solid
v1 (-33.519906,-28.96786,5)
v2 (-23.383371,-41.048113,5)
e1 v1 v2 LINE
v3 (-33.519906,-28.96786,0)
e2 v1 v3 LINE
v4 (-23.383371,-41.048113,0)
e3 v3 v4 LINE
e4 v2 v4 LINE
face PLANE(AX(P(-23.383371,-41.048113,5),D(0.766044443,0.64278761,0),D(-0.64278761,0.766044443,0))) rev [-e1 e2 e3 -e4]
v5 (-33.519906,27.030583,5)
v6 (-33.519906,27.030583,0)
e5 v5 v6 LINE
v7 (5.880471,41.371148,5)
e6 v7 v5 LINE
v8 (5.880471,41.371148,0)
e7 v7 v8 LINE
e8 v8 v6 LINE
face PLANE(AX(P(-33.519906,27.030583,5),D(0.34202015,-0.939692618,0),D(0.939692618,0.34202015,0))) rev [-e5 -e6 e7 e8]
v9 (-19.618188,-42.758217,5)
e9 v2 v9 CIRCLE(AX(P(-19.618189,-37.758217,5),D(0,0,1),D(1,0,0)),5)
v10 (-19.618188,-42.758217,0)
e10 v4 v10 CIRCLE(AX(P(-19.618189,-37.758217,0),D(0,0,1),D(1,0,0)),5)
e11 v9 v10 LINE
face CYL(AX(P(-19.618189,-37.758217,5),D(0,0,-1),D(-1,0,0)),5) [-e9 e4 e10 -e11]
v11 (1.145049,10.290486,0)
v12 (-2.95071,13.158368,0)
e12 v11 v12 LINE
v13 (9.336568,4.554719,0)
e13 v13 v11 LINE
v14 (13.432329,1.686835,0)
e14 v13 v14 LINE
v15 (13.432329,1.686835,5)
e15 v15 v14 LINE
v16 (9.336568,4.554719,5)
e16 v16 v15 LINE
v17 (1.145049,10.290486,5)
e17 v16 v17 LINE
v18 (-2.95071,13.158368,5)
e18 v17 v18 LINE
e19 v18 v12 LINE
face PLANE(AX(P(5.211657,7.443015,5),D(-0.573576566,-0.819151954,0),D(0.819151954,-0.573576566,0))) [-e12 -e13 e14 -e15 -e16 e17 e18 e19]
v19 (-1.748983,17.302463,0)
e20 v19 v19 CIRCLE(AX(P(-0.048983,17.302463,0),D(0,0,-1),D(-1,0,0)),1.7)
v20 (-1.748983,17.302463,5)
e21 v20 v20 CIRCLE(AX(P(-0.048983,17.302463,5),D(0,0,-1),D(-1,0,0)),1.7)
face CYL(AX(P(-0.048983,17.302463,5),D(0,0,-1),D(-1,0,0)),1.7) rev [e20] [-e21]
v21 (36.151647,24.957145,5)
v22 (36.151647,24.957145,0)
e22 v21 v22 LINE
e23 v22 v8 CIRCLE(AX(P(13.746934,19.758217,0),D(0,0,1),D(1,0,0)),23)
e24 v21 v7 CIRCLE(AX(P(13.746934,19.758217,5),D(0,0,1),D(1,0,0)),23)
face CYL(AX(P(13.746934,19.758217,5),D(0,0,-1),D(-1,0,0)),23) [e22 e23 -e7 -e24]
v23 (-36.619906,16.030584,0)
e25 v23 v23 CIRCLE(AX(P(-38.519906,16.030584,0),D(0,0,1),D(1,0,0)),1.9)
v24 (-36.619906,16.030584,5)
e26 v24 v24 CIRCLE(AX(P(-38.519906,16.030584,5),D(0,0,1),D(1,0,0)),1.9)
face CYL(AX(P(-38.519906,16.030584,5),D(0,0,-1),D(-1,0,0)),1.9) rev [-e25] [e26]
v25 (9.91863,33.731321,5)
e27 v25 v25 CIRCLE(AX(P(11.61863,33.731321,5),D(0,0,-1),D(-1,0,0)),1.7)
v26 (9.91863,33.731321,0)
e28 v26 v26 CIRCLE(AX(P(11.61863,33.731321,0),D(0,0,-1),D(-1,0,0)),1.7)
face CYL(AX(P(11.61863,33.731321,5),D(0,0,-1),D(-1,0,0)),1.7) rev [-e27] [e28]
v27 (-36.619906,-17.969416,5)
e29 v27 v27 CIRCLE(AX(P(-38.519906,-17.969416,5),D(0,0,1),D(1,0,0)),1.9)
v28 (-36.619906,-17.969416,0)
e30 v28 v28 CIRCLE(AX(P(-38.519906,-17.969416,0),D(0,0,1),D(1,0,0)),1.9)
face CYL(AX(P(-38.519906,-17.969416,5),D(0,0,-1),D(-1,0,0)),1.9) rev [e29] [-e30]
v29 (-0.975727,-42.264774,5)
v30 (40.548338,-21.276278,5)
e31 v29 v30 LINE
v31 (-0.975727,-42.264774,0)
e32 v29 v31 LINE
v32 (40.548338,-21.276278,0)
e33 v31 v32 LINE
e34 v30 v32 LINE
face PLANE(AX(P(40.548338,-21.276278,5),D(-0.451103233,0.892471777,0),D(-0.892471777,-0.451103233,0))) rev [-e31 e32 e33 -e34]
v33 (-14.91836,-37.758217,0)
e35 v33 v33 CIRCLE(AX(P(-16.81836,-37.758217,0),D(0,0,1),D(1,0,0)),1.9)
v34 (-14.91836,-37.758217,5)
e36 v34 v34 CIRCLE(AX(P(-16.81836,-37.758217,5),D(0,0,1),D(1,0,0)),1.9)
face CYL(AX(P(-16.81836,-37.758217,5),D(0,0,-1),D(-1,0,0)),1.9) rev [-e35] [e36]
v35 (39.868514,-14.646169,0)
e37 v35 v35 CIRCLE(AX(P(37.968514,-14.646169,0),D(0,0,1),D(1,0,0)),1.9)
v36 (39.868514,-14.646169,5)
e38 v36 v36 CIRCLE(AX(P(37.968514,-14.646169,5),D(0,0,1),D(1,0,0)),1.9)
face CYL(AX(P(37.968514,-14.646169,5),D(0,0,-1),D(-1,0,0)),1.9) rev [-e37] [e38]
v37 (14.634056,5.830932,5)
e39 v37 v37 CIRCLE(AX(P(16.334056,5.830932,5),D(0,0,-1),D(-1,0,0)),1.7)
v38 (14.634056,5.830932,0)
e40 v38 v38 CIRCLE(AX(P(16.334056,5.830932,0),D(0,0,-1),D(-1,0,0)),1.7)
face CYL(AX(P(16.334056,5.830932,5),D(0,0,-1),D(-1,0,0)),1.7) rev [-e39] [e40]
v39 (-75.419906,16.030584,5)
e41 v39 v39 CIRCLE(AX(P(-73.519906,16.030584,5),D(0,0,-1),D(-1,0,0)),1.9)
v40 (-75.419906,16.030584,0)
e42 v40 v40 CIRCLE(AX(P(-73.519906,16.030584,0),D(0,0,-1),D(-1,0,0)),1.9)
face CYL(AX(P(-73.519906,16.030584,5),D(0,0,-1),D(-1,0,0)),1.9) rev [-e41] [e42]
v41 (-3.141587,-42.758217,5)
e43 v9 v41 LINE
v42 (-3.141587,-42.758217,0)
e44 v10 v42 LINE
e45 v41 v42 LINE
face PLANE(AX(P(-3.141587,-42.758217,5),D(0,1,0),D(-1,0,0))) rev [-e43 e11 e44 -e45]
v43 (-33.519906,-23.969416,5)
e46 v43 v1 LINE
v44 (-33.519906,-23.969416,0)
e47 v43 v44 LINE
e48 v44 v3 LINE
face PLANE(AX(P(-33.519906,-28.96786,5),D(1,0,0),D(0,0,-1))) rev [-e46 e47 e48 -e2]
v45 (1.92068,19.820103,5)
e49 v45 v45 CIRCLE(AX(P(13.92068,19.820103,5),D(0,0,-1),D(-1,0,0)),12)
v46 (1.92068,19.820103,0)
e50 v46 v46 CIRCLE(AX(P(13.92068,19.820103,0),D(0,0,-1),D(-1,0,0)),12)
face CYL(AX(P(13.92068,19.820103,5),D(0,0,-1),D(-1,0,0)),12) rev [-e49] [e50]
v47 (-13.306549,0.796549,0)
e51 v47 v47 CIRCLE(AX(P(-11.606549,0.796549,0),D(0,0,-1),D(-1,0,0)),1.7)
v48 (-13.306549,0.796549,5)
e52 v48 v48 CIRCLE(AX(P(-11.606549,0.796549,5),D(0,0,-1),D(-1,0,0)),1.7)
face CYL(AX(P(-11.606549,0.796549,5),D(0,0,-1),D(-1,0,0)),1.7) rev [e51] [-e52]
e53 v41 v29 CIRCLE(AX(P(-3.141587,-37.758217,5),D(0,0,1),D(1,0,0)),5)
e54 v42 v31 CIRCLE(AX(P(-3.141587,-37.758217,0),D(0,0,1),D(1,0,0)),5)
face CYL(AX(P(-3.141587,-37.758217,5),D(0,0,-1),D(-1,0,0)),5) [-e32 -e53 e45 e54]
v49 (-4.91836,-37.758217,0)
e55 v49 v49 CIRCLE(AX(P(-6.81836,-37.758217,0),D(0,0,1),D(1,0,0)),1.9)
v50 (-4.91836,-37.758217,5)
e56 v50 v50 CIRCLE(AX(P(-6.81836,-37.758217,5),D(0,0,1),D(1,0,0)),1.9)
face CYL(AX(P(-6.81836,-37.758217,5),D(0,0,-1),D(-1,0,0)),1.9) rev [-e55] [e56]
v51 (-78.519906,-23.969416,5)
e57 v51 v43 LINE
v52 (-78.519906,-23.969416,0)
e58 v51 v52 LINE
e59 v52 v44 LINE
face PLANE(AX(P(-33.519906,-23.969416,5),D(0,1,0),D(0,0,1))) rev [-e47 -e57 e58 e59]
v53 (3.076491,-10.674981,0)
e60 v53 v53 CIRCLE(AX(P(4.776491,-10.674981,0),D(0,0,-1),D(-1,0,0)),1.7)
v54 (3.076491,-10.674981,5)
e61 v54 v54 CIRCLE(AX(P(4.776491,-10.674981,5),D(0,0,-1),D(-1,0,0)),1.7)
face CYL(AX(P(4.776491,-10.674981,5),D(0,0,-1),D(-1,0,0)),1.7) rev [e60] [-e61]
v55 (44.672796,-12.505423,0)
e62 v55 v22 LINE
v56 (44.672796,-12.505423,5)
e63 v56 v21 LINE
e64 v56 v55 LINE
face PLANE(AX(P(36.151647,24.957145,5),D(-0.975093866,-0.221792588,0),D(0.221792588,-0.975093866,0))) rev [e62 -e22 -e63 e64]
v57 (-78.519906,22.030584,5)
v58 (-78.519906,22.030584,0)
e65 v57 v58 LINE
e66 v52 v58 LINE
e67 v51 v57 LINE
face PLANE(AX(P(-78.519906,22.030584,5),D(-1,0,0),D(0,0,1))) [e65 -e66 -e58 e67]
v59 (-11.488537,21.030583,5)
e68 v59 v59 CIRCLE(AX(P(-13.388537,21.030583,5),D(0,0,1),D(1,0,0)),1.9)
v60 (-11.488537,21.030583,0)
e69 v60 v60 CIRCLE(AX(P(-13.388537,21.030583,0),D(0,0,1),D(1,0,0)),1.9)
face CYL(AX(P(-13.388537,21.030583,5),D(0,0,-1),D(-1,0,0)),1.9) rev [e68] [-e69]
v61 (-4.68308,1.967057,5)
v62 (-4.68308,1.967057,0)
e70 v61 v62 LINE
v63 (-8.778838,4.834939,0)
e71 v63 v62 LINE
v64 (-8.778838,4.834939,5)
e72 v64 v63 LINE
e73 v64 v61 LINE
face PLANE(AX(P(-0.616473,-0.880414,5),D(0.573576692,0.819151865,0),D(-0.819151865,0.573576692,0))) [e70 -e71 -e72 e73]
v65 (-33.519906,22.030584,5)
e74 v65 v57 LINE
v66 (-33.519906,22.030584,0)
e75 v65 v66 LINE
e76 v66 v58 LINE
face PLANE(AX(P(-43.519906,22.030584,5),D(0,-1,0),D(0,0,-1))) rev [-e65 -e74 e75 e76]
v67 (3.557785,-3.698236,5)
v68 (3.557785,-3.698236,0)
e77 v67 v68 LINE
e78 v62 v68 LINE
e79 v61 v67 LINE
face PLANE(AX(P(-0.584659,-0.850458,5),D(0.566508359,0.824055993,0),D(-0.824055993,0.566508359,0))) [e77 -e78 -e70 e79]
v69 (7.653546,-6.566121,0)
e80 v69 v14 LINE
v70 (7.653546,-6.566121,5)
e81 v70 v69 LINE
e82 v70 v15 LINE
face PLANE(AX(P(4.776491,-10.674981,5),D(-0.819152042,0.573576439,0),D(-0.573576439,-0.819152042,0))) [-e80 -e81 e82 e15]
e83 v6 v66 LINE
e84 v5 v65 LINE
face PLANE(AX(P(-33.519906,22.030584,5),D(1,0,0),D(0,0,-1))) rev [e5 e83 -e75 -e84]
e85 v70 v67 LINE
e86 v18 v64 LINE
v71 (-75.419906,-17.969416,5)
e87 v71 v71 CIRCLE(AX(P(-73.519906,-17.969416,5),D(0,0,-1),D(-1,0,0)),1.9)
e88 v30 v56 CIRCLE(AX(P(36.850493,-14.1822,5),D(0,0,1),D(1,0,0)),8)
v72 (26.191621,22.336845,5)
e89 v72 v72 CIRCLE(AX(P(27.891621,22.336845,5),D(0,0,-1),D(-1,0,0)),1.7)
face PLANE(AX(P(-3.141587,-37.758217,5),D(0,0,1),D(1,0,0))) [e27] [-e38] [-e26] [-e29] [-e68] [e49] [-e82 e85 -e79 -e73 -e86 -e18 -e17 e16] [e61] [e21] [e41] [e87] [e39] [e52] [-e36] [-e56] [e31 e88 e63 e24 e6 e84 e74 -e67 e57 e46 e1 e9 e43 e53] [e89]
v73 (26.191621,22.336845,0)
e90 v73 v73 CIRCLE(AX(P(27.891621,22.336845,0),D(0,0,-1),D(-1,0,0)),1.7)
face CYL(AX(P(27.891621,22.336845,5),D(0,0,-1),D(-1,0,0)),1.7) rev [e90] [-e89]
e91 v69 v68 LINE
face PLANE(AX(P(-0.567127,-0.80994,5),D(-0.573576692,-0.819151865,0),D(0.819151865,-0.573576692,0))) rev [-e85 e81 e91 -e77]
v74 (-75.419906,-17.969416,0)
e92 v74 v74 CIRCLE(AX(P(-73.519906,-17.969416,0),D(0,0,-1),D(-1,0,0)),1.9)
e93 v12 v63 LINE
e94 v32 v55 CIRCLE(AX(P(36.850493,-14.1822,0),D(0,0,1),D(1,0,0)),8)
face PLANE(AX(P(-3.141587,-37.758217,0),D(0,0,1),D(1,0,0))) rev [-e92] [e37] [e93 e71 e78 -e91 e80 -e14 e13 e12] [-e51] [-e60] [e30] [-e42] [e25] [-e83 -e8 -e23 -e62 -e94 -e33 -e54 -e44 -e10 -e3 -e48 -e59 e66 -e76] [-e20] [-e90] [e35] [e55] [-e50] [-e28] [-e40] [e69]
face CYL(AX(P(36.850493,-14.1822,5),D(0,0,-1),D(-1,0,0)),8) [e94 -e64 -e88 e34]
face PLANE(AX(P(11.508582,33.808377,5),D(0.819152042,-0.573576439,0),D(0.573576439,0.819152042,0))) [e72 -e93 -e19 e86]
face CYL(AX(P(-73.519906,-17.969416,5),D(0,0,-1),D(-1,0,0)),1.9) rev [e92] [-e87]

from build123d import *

# Parameters (mm, degrees)
ESQUISSE1_R         = 1.9
BOSS_EXTRU_1_DEPTH  = 5
EXTRUDE_1_DEPTH     = 5
EXTRUDE_2_DEPTH     = 5
SKETCH_6_R          = 1.6
CUT_EXTRUDE_2_DEPTH = 5
EXTRUDE_4_DEPTH     = 5
CUT_EXTRUDE_3_DEPTH = 5
EXTRUDE_6_DEPTH     = 5
SKETCH_10_R         = 12
CUT_EXTRUDE_4_DEPTH = 5
SKETCH_11_R         = 12.59581588
SKETCH_11_R_2       = 8.721789125
EXTRUDE_7_DEPTH     = 5
SKETCH_12_R         = 12
CUT_EXTRUDE_5_DEPTH = 5
SKETCH_13_R         = 3.051220473
SKETCH_13_R_2       = 0.885355671
SKETCH_13_R_3       = 2.495868873
SKETCH_13_R_4       = 0.973791961
EXTRUDE_8_DEPTH     = 5
SKETCH_14_R         = 1.6
SKETCH_14_R_2       = 12
CUT_EXTRUDE_6_DEPTH = 5
EXTRUDE_START       = -5
EXTRUDE_9_DEPTH     = 5
SKETCH_16_R         = 1.7
CUT_EXTRUDE_7_DEPTH = 5
SKETCH_17_W         = 35
SKETCH_17_H         = 46
EXTRUDE_10_DEPTH    = 5
SKETCH_18_R         = 1.9
CUT_EXTRUDE_8_DEPTH = 5


# Read off the part's stored shape, not the designer's step: 凸台-拉伸9
with BuildPart() as part:
    # Esquisse1 → Boss.-Extru.1 (new body)
    with BuildSketch(Plane.XY):
        with BuildLine():
            Line((40.548338426, -21.276277818), (-0.975727052, -42.264773686))
            ThreePointArc((-0.975727052, -42.264773686), (-2.030907408, -42.633295828), (-3.141586831, -42.758217285))
            Line((-3.141586831, -42.758217285), (-19.618188193, -42.758217285))
            ThreePointArc((-19.618188193, -42.758217285), (-21.685859542, -42.310660648), (-23.383370665, -41.048112535))
            Line((-23.383370665, -41.048112535), (-33.519906154, -28.967859949))
            Line((-33.519906154, -28.967859949), (-33.519906154, -23.969415955))
            Line((-33.519906154, -23.969415955), (-43.519906154, -23.969415955))
            Line((-43.519906154, -23.969415955), (-43.519906154, 22.030584045))
            Line((-43.519906154, 22.030584045), (-33.519906154, 22.030584045))
            Line((-33.519906154, 22.030584045), (-33.519906154, 27.030582734))
            Line((-33.519906154, 27.030582734), (5.8804708, 41.371147503))
            ThreePointArc((5.8804708, 41.371147503), (24.71028401, 39.977143129), (36.151646844, 24.957145453))
            Line((36.151646844, 24.957145453), (44.672795688, -12.50542283))
            ThreePointArc((44.672795688, -12.50542283), (44.089997655, -17.586546272), (40.548338426, -21.276277818))
        make_face()
        with Locations((37.968513549, -14.646168575)):
            Circle(ESQUISSE1_R, mode=Mode.SUBTRACT)
        with Locations((26.290921771, 28.768039745)):
            Circle(ESQUISSE1_R, mode=Mode.SUBTRACT)
        with Locations((18.099401328, 34.503804109)):
            Circle(ESQUISSE1_R, mode=Mode.SUBTRACT)
        with Locations((-1.81432361, -11.370410425)):
            Circle(ESQUISSE1_R, mode=Mode.SUBTRACT)
        with Locations((-10.005844053, -5.634646061)):
            Circle(ESQUISSE1_R, mode=Mode.SUBTRACT)
        with Locations((-13.38853652, 21.030583318)):
            Circle(ESQUISSE1_R, mode=Mode.SUBTRACT)
        with Locations((-6.818359545, -37.758216658)):
            Circle(ESQUISSE1_R, mode=Mode.SUBTRACT)
        with Locations((-16.818359545, -37.758216658)):
            Circle(ESQUISSE1_R, mode=Mode.SUBTRACT)
        with Locations((-38.519906154, -17.969415955)):
            Circle(ESQUISSE1_R, mode=Mode.SUBTRACT)
        with Locations((-38.519906154, 16.030584045)):
            Circle(ESQUISSE1_R, mode=Mode.SUBTRACT)
        with BuildLine():
            Line((21.617307412, 29.328732493), (24.05500749, 32.810128977))
            ThreePointArc((24.05500749, 32.810128977), (23.766600359, 33.932469516), (22.625252159, 33.732091761))
            Line((22.625252159, 33.732091761), (20.187552449, 30.250695803))
            ThreePointArc((20.187552449, 30.250695803), (18.892160946, 29.381199086), (17.366350313, 29.706722658))
            Line((17.366350313, 29.706722658), (11.508582376, 33.808377058))
            Line((11.508582376, 33.808377058), (-11.606548602, 0.796549047))
            Line((-11.606548602, 0.796549047), (-5.749613357, -3.304522496))
            ThreePointArc((-5.749613357, -3.304522496), (-4.927150936, -4.595530225), (-5.258462389, -6.089979325))
            Line((-5.258462389, -6.089979325), (-7.696162511, -9.571375872))
            ThreePointArc((-7.696162511, -9.571375872), (-7.487422906, -10.755197269), (-6.303601509, -10.546457664))
            Line((-6.303601509, -10.546457664), (-3.865901833, -7.065061754))
            ThreePointArc((-3.865901833, -7.065061754), (-2.574894061, -6.242599111), (-1.080444801, -6.573910562))
            Line((-1.080444801, -6.573910562), (4.776491193, -10.67498149))
            Line((4.776491193, -10.67498149), (27.891620971, 22.336844808))
            Line((27.891620971, 22.336844808), (22.031293977, 26.440291454))
            ThreePointArc((22.031293977, 26.440291454), (21.198678089, 27.79484445), (21.617307412, 29.328732493))
        make_face(mode=Mode.SUBTRACT)
    extrude(amount=BOSS_EXTRU_1_DEPTH)

    # 草图3 → 凸台-拉伸1 (add)
    with BuildSketch(Plane.XY.offset(5)):
        Polygon((17.366350313, 29.706722658), (22.031293977, 26.440291454), (27.521539946, 34.281169324), (22.856520703, 37.547606144), align=None)
    extrude(amount=-EXTRUDE_1_DEPTH)

    # 草图4 → 凸台-拉伸2 (add)
    with BuildSketch(Plane.XY.offset(5)):
        Polygon((-5.749613357, -3.304522496), (-1.080444801, -6.573910562), (-5.905310476, -13.464530652), (-10.574479032, -10.195142586), align=None)
    extrude(amount=-EXTRUDE_2_DEPTH)

    # 草图6 → 切除-拉伸2 (cut)
    with BuildSketch(Plane.XY):
        with Locations((11.618629634, 33.731321117)):
            Circle(SKETCH_6_R)
        with Locations((27.891620971, 22.336844808)):
            Circle(SKETCH_6_R)
        with Locations((-11.606548602, 0.796549047)):
            Circle(SKETCH_6_R)
        with Locations((4.776491193, -10.67498149)):
            Circle(SKETCH_6_R)
        with Locations((16.334056082, 5.830931659)):
            Circle(SKETCH_6_R)
        with Locations((-0.048983113, 17.302463052)):
            Circle(SKETCH_6_R)
    extrude(amount=CUT_EXTRUDE_2_DEPTH, mode=Mode.SUBTRACT)

    # 草图7 → 凸台-拉伸4 (add)
    with BuildSketch(Plane(origin=(0, 0, 0), x_dir=(-1, 0, 0), z_dir=(0, 0, -1))):
        Polygon((-27.348574266, 25.536925262), (-13.960830243, 33.567092121), (-17.290103765, 39.11759468), (-30.677847788, 31.087427821), align=None)
        Polygon((-1.835596657, -11.454822901), (11.156296117, -1.885351923), (15.083921052, -7.217651078), (2.092028278, -16.787122056), align=None)
    extrude(amount=-EXTRUDE_4_DEPTH)

    # 草图8 → 切除-拉伸3 (cut)
    with BuildSketch(Plane(origin=(0, 0, 0), x_dir=(-1, 0, 0), z_dir=(0, 0, -1))):
        with BuildLine():
            ThreePointArc((-19.485360525, 10.331460788), (-15.741376215, 8.971828118), (-11.75865467, 9.034666013))
            Line((-11.75865467, 9.034666013), (-4.525140456, 14.099627228))
            ThreePointArc((-4.525140456, 14.099627228), (-3.329387761, 16.849491145), (-2.920679758, 19.820102839))
            ThreePointArc((-2.920679758, 19.820102839), (-2.965693001, 20.8142181), (-3.100364331, 21.800197297))
            Line((-3.100364331, 21.800197297), (-8.359233833, 29.310641244))
            ThreePointArc((-8.359233833, 29.310641244), (-12.101833808, 30.668687973), (-16.082707796, 30.605539073))
            Line((-16.082707796, 30.605539073), (-17.366350313, 29.706722658))
            Line((-17.366350313, 29.706722658), (-22.031293977, 26.440291454))
            Line((-22.031293977, 26.440291454), (-23.316220712, 25.540575737))
            ThreePointArc((-23.316220712, 25.540575737), (-24.737438626, 21.819534658), (-24.740319575, 17.836320031))
            Line((-24.740319575, 17.836320031), (-19.485360525, 10.331460788))
        make_face()
        with BuildLine():
            Line((-8.359233833, 29.310641244), (-3.100364331, 21.800197297))
            ThreePointArc((-3.100364331, 21.800197297), (-4.910007291, 26.129443667), (-8.359233833, 29.310641244))
        make_face()
        with BuildLine():
            ThreePointArc((-16.082707796, 30.605539073), (-20.230023119, 28.830773532), (-23.316220712, 25.540575737))
            Line((-23.316220712, 25.540575737), (-22.031293977, 26.440291454))
            Line((-22.031293977, 26.440291454), (-17.366350313, 29.706722658))
            Line((-17.366350313, 29.706722658), (-16.082707796, 30.605539073))
        make_face()
        with BuildLine():
            ThreePointArc((-24.740319575, 17.836320031), (-22.931352225, 13.510762011), (-19.485360525, 10.331460788))
            Line((-19.485360525, 10.331460788), (-24.740319575, 17.836320031))
        make_face()
    extrude(amount=-CUT_EXTRUDE_3_DEPTH, mode=Mode.SUBTRACT)

    # 草图9 → 凸台-拉伸6 (add)
    with BuildSketch(Plane(origin=(0, 0, 0), x_dir=(-1, 0, 0), z_dir=(0, 0, -1))):
        with BuildLine():
            ThreePointArc((-25.974969527, 19.599582888), (-25.771002401, 21.991557628), (-25.094991232, 24.295066831))
            Line((-25.094991269, 24.295066884), (-26.580977893, 23.254567382))
            ThreePointArc((-26.580977858, 23.254567332), (-26.365673891, 22.817974219), (-26.291620971, 22.336844808))
            ThreePointArc((-26.291620971, 22.336844808), (-26.472403636, 21.598047029), (-26.973898668, 21.02620154))
            Line((-26.973898668, 21.02620154), (-25.974969527, 19.599582888))
        make_face()
        with BuildLine():
            ThreePointArc((-11.976590293, 31.613327776), (-10.804649732, 31.354387066), (-9.664437004, 30.979673968))
            Line((-9.664437004, 30.979673968), (-10.692189677, 32.426825426))
            ThreePointArc((-10.692189677, 32.426825426), (-11.261577481, 32.17166931), (-11.885263309, 32.153694265))
            Line((-11.885263309, 32.153694265), (-11.976590293, 31.613327776))
        make_face()
        with BuildLine():
            ThreePointArc((-14.41526284, 31.773096587), (-13.191848686, 31.755455968), (-11.976590293, 31.613327776))
            Line((-11.976590293, 31.613327776), (-11.885263309, 32.153694265))
            ThreePointArc((-11.885263309, 32.153694265), (-12.4735091, 32.3788489), (-12.929272711, 32.813598543))
            Line((-12.929272711, 32.813598543), (-14.41526284, 31.773096587))
        make_face()
        with BuildLine():
            ThreePointArc((-1.261660013, 16.384740548), (-1.527626733, 17.575045871), (-0.877456843, 18.606958743))
            Line((-0.877456843, 18.606958743), (-1.982414842, 20.162820986))
            ThreePointArc((-1.982414842, 20.162820986), (-1.97786095, 19.971997834), (-1.976342858, 19.781126388))
            ThreePointArc((-1.976342858, 19.781126388), (-2.198741813, 17.481536505), (-2.85769513, 15.267184353))
            Line((-2.85769513, 15.267184353), (-1.261660013, 16.384740548))
        make_face()
        with BuildLine():
            Line((-16.067422406, 7.408558511), (-15.976095422, 7.948925))
            ThreePointArc((-15.976095422, 7.948925), (-17.128646557, 8.202569423), (-18.250709888, 8.568196954))
            Line((-18.250709888, 8.568196954), (-17.251778384, 7.141574927))
            ThreePointArc((-17.251778384, 7.141574927), (-16.685907128, 7.39176504), (-16.067422406, 7.408558511))
        make_face()
        with BuildLine():
            Line((-15.023412956, 6.748654164), (-13.537422544, 7.789156201))
            ThreePointArc((-13.537422544, 7.789156201), (-14.760836864, 7.806796797), (-15.976095422, 7.948925))
            Line((-15.976095422, 7.948925), (-16.067422406, 7.408558511))
            ThreePointArc((-16.067422406, 7.408558511), (-15.479176579, 7.183403853), (-15.023412956, 6.748654164))
        make_face()
    extrude(amount=-EXTRUDE_6_DEPTH)


with BuildPart() as extrude_6_piece_1:
    # of the separate pieces the step leaves, piece 1, a body of its own (extrude_6_pieces)
    add(part.part.solids().sort_by_distance((40.548338426, -21.276277818, 0))[0])


with BuildPart() as extrude_6_piece_2:
    # of the separate pieces the step leaves, piece 2, a body of its own (extrude_6_pieces)
    add(part.part.solids().sort_by_distance((2.85769513, 15.267184353, 0))[0])


with BuildPart() as cut_extrude_4_tool:
    # 草图10 → 切除-拉伸4 (new body)
    with BuildSketch(Plane(origin=(0, 0, 0), x_dir=(-1, 0, 0), z_dir=(0, 0, -1))):
        with Locations((-13.920679758, 19.820102839)):
            Circle(SKETCH_10_R)
    extrude(amount=-CUT_EXTRUDE_4_DEPTH)


with BuildPart() as extrude_6_piece_1_1:
    add(extrude_6_piece_1.part)

    # 切除-拉伸4: cut by cut_extrude_4_tool
    add(cut_extrude_4_tool.part, mode=Mode.SUBTRACT)



with BuildPart() as extrude_6_piece_2_1:
    add(extrude_6_piece_2.part)

    # 切除-拉伸4: cut by cut_extrude_4_tool
    add(cut_extrude_4_tool.part, mode=Mode.SUBTRACT)


with BuildPart() as extrude_6_piece_1_2:
    add(extrude_6_piece_1_1.part)

    add(extrude_6_piece_2_1.part)  # 凸台-拉伸7 merges 凸台-拉伸6 piece 2
    # 草图11 → 凸台-拉伸7 (add)
    with BuildSketch(Plane(origin=(0, 0, 0), x_dir=(-1, 0, 0), z_dir=(0, 0, -1))):
        with Locations((-13.920679758, 19.820102839)):
            Circle(SKETCH_11_R)
        with Locations((-13.920679758, 19.820102839)):
            Circle(SKETCH_11_R_2, mode=Mode.SUBTRACT)
    extrude(amount=-EXTRUDE_7_DEPTH)

    # 草图12 → 切除-拉伸5 (cut)
    with BuildSketch(Plane(origin=(0, 0, 0), x_dir=(-1, 0, 0), z_dir=(0, 0, -1))):
        with Locations((-13.920679758, 19.820102839)):
            Circle(SKETCH_12_R)
    extrude(amount=-CUT_EXTRUDE_5_DEPTH, mode=Mode.SUBTRACT)

    # 草图13 → 凸台-拉伸8 (add)
    # profile 1 of 2: a face of its own
    with BuildSketch(Plane(origin=(0, 0, 0), x_dir=(-1, 0, 0), z_dir=(0, 0, -1))):
        with Locations((-11.618629634, 33.731321117)):
            Circle(SKETCH_13_R)
        with Locations((-11.618629634, 33.731321117)):
            Circle(SKETCH_13_R_2, mode=Mode.SUBTRACT)
    # profile 2 of 2: a face of its own
    with BuildSketch(Plane(origin=(0, 0, 0), x_dir=(-1, 0, 0), z_dir=(0, 0, -1))):
        with Locations((0.048983113, 17.302463052)):
            Circle(SKETCH_13_R_3)
        with Locations((0.048983113, 17.302463052)):
            Circle(SKETCH_13_R_4, mode=Mode.SUBTRACT)
    extrude(amount=-EXTRUDE_8_DEPTH)

    # 草图14 → 切除-拉伸6 (cut)
    with BuildSketch(Plane(origin=(0, 0, 0), x_dir=(-1, 0, 0), z_dir=(0, 0, -1))):
        with Locations((-11.618629634, 33.731321117)):
            Circle(SKETCH_14_R)
        with Locations((0.048983113, 17.302463052)):
            Circle(SKETCH_14_R)
        with Locations((-13.920679758, 19.820102839)):
            Circle(SKETCH_14_R_2)
    extrude(amount=-CUT_EXTRUDE_6_DEPTH, mode=Mode.SUBTRACT)

    # 凸台-拉伸9 outline → 凸台-拉伸9 (add)
    with BuildSketch(Plane(origin=(0, 0, 0), x_dir=(-1, 0, 0), z_dir=(0, 0, -1)).offset(EXTRUDE_START)):
        with BuildLine():
            ThreePointArc((-5.694213495, -9.364338222), (-4.498653765, -9.099289146), (-3.465847518, -9.757259768))
            Line((-3.465847518, -9.757259768), (10.295905471, -0.121173451))
            ThreePointArc((10.295905471, -0.121173451), (10.030856176, 1.074386008), (10.688826299, 2.107192315))
            Line((10.688826299, 2.107192315), (8.778837554, 4.834938915))
            Line((8.778837554, 4.834938915), (4.683080137, 1.967056791))
            Line((4.683080137, 1.967056791), (-3.557784811, -3.698236488))
            Line((-3.557784811, -3.698236488), (-7.653546083, -6.566121311))
            Line((-7.653546083, -6.566121311), (-5.694213495, -9.364338222))
        make_face()
        with BuildLine():
            Line((-15.416333779, 4.520288391), (-13.432329414, 1.68683653))
            Line((-13.432329414, 1.68683653), (2.950709781, 13.158367923))
            Line((2.950709781, 13.158367923), (1.480554693, 15.257966967))
            ThreePointArc((1.480554693, 15.257966967), (-0.363835187, 14.84097113), (-1.971266959, 15.836874066))
            ThreePointArc((-1.971266959, 15.836874066), (-6.72465494, 9.482220826), (-14.334431516, 7.231084324))
            Line((-14.334431516, 7.231084324), (-15.023412956, 6.748654164))
            ThreePointArc((-15.023412956, 6.748654164), (-14.758363655, 5.553094702), (-15.416333779, 4.520288391))
        make_face()
    extrude(amount=EXTRUDE_9_DEPTH)

    # 草图16 → 切除-拉伸7 (cut)
    with BuildSketch(Plane(origin=(0, 0, 0), x_dir=(-1, 0, 0), z_dir=(0, 0, -1))):
        with Locations((-16.334056082, 5.830931659)):
            Circle(SKETCH_16_R)
        with Locations((-4.776491193, -10.67498149)):
            Circle(SKETCH_16_R)
        with Locations((11.606548602, 0.796549047)):
            Circle(SKETCH_16_R)
        with Locations((-11.618629634, 33.731321117)):
            Circle(SKETCH_16_R)
        with Locations((0.048983113, 17.302463052)):
            Circle(SKETCH_16_R)
        with Locations((-27.891620971, 22.336844808)):
            Circle(SKETCH_16_R)
    extrude(amount=-CUT_EXTRUDE_7_DEPTH, mode=Mode.SUBTRACT)

    # 草图17 → 凸台-拉伸10 (add)
    with BuildSketch(Plane(origin=(0, 0, 0), x_dir=(-1, 0, 0), z_dir=(0, 0, -1))):
        with Locations((61.019906154, -0.969415955)):
            Rectangle(SKETCH_17_W, SKETCH_17_H)
    extrude(amount=-EXTRUDE_10_DEPTH)

    # 草图18 → 切除-拉伸8 (cut)
    with BuildSketch(Plane(origin=(0, 0, 0), x_dir=(-1, 0, 0), z_dir=(0, 0, -1))):
        with Locations((73.519906154, 16.030584045)):
            Circle(SKETCH_18_R)
        with Locations((73.519906154, -17.969415955)):
            Circle(SKETCH_18_R)
    extrude(amount=-CUT_EXTRUDE_8_DEPTH, mode=Mode.SUBTRACT)


solid = extrude_6_piece_1_2.part
